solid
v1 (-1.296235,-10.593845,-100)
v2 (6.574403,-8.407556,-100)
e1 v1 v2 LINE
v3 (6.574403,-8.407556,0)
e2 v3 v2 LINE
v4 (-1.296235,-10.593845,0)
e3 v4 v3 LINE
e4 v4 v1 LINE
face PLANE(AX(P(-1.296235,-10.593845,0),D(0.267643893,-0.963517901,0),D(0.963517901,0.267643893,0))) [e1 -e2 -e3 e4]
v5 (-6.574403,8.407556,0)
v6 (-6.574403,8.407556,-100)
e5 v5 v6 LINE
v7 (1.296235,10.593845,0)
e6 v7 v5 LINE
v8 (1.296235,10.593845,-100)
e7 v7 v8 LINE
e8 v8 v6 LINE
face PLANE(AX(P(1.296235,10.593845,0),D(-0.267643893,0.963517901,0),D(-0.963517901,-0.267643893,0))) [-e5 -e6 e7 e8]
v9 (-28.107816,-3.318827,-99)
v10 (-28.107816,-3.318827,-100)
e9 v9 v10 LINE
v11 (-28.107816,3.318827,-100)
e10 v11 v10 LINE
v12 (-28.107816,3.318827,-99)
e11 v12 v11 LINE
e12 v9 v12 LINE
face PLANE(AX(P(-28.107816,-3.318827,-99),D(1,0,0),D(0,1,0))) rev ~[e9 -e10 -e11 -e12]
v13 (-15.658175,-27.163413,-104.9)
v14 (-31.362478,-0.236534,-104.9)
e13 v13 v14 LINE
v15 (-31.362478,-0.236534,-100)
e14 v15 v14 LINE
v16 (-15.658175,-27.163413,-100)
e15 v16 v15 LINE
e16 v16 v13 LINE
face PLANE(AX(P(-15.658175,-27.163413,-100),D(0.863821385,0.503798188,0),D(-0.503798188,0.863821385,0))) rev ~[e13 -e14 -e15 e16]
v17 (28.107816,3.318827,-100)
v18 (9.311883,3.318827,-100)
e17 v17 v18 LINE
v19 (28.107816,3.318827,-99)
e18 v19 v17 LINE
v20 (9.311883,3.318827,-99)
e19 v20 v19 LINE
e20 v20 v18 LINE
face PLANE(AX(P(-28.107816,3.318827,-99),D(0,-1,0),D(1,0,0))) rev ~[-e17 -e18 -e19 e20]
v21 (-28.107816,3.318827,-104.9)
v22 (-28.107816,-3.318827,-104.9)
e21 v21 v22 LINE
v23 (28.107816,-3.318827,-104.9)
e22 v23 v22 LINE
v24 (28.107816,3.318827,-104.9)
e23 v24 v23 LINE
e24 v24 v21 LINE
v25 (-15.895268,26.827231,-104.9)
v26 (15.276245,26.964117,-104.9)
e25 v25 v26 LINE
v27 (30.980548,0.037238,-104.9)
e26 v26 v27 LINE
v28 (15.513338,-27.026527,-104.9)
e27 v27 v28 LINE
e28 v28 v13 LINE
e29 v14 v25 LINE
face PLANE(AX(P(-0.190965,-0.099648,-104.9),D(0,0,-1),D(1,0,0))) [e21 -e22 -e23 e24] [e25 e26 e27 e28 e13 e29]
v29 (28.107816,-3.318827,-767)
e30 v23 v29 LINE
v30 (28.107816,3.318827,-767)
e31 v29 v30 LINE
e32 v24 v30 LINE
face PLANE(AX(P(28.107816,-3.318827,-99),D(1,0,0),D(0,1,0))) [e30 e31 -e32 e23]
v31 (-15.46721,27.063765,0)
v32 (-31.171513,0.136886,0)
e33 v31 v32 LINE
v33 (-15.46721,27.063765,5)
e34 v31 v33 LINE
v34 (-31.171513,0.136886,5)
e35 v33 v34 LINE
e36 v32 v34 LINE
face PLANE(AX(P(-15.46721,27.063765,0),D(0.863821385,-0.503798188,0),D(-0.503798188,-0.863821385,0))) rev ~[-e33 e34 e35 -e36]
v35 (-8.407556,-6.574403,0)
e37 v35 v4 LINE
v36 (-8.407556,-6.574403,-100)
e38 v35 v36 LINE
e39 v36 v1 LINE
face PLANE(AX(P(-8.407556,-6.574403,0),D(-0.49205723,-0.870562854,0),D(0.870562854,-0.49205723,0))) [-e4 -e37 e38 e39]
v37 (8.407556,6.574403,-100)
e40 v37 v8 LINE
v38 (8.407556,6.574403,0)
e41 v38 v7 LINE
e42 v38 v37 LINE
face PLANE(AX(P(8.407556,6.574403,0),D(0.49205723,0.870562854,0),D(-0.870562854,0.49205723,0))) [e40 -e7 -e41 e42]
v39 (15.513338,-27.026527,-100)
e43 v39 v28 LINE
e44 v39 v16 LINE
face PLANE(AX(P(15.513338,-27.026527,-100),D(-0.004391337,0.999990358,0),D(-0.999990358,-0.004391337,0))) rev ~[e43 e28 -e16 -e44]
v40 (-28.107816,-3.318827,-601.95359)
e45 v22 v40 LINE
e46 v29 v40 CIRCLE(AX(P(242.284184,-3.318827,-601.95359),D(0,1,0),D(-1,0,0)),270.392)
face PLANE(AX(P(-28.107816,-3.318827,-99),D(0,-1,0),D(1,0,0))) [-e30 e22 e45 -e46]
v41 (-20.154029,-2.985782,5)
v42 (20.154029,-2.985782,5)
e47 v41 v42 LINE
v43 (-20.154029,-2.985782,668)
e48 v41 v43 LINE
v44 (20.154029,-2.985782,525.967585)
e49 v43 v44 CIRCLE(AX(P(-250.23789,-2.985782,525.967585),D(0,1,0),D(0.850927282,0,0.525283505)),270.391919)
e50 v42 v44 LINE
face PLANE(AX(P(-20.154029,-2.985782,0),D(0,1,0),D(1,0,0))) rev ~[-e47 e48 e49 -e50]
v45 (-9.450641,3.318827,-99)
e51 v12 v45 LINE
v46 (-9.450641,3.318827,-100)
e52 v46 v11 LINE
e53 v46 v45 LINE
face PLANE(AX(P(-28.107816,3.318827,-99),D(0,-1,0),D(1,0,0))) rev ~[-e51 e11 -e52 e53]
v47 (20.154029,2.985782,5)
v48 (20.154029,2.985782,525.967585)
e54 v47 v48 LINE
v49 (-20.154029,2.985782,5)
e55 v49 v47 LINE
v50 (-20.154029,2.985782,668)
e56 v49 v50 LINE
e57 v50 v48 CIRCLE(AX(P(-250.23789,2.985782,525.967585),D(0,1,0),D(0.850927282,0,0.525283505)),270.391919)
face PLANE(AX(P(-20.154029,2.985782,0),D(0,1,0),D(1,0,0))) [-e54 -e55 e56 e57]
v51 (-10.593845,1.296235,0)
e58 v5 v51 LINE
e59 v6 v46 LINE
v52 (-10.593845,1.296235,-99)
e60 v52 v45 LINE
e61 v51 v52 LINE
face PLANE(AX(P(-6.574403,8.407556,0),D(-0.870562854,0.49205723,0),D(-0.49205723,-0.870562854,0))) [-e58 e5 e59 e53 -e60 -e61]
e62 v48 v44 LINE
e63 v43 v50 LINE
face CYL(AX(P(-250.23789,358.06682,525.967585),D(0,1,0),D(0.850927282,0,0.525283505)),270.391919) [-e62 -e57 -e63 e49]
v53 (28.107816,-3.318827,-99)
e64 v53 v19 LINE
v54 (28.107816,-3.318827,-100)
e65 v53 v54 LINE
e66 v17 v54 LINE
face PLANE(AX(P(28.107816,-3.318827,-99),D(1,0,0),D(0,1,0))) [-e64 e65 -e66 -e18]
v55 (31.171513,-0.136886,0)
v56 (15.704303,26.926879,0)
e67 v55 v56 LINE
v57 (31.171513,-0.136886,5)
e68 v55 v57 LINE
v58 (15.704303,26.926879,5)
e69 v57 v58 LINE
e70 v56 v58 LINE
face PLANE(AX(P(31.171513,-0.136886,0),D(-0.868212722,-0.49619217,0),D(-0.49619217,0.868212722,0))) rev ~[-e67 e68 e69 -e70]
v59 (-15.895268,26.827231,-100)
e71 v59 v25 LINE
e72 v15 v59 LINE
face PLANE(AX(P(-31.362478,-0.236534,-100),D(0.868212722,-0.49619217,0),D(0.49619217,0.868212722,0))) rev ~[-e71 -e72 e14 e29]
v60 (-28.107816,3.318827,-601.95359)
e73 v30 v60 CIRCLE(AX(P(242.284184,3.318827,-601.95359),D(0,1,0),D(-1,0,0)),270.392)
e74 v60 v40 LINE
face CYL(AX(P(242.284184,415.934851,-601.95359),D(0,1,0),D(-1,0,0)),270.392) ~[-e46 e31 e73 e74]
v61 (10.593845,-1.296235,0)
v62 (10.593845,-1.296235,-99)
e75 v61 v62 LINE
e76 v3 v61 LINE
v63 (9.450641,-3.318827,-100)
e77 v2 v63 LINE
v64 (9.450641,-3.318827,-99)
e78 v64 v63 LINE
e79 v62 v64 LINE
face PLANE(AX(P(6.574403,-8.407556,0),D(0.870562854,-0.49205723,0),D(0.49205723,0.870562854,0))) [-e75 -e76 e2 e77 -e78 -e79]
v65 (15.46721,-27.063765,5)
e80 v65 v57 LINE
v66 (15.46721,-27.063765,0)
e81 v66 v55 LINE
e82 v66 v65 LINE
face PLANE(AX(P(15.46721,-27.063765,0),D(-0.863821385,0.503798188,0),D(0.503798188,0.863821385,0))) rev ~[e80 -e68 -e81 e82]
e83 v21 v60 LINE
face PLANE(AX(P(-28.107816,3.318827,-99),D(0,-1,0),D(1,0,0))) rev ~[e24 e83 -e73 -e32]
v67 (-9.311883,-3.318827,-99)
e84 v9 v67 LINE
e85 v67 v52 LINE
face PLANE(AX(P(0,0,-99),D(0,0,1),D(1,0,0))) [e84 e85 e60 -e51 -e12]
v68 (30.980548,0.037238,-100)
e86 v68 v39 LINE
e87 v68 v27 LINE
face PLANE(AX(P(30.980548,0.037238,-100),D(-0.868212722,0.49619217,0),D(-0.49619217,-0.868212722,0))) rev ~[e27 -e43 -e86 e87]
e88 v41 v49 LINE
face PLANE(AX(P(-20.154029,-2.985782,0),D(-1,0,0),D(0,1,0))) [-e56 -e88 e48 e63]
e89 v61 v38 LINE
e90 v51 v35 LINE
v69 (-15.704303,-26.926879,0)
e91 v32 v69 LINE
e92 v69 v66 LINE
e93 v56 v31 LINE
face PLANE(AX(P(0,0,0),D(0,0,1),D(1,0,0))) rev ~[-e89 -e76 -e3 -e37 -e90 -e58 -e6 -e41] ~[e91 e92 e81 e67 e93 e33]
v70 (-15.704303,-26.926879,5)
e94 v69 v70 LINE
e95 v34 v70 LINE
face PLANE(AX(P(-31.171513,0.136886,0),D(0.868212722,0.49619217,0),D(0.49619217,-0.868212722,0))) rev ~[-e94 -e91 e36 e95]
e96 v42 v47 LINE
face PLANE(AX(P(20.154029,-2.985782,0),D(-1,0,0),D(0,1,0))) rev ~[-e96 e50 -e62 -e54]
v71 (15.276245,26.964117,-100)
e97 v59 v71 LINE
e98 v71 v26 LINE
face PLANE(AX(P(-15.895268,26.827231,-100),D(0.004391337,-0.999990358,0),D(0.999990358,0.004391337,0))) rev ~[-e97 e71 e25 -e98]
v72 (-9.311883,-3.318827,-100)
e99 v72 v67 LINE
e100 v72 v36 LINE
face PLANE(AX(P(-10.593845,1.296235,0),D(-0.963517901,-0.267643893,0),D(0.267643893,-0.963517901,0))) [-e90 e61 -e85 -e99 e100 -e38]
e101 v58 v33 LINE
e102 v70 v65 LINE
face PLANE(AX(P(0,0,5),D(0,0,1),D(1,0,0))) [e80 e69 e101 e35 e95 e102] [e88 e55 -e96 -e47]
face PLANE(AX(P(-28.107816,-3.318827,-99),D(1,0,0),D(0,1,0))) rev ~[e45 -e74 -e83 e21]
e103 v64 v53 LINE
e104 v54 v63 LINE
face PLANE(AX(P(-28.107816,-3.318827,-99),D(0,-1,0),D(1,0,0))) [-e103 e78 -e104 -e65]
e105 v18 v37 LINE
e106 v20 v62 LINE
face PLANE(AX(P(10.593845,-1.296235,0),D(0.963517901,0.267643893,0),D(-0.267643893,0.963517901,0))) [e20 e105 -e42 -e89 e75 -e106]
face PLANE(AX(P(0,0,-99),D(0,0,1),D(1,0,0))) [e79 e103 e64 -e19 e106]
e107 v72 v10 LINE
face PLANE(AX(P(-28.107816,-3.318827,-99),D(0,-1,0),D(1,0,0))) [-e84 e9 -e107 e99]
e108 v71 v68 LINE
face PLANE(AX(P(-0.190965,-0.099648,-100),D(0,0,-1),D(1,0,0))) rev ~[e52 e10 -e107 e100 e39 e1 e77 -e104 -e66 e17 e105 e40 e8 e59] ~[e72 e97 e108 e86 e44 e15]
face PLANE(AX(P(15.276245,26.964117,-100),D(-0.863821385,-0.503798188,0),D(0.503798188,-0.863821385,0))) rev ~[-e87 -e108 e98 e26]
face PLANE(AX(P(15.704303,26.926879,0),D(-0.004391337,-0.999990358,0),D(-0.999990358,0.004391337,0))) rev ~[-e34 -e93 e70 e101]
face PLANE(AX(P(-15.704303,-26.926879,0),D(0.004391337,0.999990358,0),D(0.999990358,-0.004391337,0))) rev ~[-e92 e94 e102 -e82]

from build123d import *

# Parameters (mm, degrees)
F0_W         = 40.3080582619
F0_H         = 5.9715644456
F1_DEPTH     = 668
F3_DEPTH     = 100
F5_DEPTH     = 5
F6_T1_DEPTH  = 716.1336390313
F9_DEPTH     = 4.9
F10_W        = 56.2156327069
F10_H        = 6.6376542673
F11_DEPTH    = 668
F12_T1_DEPTH = 831.8697028016


# Not quite as in the source:
# - a fillet or chamfer that OpenCascade refuses, or shapes differently, is made with other operations: its cross-section is extruded or revolved along the edge and cut away or added


with BuildPart() as f1:
    # F0 (on Top) → F1 (new body)
    with BuildSketch(Plane.XY):
        Rectangle(F0_W, F0_H)
    extrude(amount=F1_DEPTH)

    # F2 (on Top) → F3 (join)
    with BuildSketch(Plane.XY):
        Polygon((6.5744029718, -8.407556447), (10.5938451005, -1.2962352533), (8.407556447, 6.5744029718), (1.2962352533, 10.5938451005), (-6.5744029718, 8.407556447), (-10.5938451005, 1.2962352533), (-8.407556447, -6.5744029718), (-1.2962352533, -10.5938451005), align=None)
    extrude(amount=-F3_DEPTH)

    # F4 (on Top) → F5 (join)
    with BuildSketch(Plane.XY):
        Polygon((31.1715127681, -0.1368859226), (15.7043030704, 26.9268789703), (-15.4672096977, 27.0637648929), (-31.1715127681, 0.1368859226), (-15.7043030704, -26.9268789703), (15.4672096977, -27.0637648929), align=None)
    extrude(amount=F5_DEPTH)

    # F6: fillet of radius 270.3919189858 on 1 edges, made by hand

    # F6_s2 → F6_t1 (cut)
    with BuildSketch(Plane.XZ.offset(-358.0668195157)):
        with BuildLine():
            ThreePointArc((-20.1540291309, 668), (9.881896476, 599.7882231999), (20.1540291309, 525.9675850829))
            Line((20.1540291309, 525.9675850829), (20.1540291309, 668))
            Line((20.1540291309, 668), (-20.1540291309, 668))
        make_face()
    extrude(amount=F6_T1_DEPTH, mode=Mode.SUBTRACT)

    # F8 (on face) → F9 (join)
    with BuildSketch(Plane(origin=(0, 0, -100), x_dir=(1, 0, 0), z_dir=(0, 0, -1))):
        Polygon((30.9805478901, -0.0372380018), (15.5133381924, 27.0265268911), (-15.6581745757, 27.1634128136), (-31.3624776462, 0.2365338433), (-15.8952679485, -26.8272310495), (15.2762448196, -26.9641169721), align=None)
    extrude(amount=F9_DEPTH)

    # F10 (on offset) → F11 (join)
    with BuildSketch(Plane.XY.offset(-99)):
        Rectangle(F10_W, F10_H)
    extrude(amount=-F11_DEPTH)

    # F12: fillet of radius 270.392 on 1 edges, made by hand

    # F12_s2 → F12_t1 (cut)
    with BuildSketch(Plane.XZ.offset(-415.9348514008)):
        with BuildLine():
            ThreePointArc((-28.1078163534, -601.9535902931), (-13.6683607529, -689.132307188), (28.1078163534, -767))
            Line((28.1078163534, -767), (-28.1078163534, -767))
            Line((-28.1078163534, -767), (-28.1078163534, -601.9535902931))
        make_face()
    extrude(amount=F12_T1_DEPTH, mode=Mode.SUBTRACT)


solid = f1.part
